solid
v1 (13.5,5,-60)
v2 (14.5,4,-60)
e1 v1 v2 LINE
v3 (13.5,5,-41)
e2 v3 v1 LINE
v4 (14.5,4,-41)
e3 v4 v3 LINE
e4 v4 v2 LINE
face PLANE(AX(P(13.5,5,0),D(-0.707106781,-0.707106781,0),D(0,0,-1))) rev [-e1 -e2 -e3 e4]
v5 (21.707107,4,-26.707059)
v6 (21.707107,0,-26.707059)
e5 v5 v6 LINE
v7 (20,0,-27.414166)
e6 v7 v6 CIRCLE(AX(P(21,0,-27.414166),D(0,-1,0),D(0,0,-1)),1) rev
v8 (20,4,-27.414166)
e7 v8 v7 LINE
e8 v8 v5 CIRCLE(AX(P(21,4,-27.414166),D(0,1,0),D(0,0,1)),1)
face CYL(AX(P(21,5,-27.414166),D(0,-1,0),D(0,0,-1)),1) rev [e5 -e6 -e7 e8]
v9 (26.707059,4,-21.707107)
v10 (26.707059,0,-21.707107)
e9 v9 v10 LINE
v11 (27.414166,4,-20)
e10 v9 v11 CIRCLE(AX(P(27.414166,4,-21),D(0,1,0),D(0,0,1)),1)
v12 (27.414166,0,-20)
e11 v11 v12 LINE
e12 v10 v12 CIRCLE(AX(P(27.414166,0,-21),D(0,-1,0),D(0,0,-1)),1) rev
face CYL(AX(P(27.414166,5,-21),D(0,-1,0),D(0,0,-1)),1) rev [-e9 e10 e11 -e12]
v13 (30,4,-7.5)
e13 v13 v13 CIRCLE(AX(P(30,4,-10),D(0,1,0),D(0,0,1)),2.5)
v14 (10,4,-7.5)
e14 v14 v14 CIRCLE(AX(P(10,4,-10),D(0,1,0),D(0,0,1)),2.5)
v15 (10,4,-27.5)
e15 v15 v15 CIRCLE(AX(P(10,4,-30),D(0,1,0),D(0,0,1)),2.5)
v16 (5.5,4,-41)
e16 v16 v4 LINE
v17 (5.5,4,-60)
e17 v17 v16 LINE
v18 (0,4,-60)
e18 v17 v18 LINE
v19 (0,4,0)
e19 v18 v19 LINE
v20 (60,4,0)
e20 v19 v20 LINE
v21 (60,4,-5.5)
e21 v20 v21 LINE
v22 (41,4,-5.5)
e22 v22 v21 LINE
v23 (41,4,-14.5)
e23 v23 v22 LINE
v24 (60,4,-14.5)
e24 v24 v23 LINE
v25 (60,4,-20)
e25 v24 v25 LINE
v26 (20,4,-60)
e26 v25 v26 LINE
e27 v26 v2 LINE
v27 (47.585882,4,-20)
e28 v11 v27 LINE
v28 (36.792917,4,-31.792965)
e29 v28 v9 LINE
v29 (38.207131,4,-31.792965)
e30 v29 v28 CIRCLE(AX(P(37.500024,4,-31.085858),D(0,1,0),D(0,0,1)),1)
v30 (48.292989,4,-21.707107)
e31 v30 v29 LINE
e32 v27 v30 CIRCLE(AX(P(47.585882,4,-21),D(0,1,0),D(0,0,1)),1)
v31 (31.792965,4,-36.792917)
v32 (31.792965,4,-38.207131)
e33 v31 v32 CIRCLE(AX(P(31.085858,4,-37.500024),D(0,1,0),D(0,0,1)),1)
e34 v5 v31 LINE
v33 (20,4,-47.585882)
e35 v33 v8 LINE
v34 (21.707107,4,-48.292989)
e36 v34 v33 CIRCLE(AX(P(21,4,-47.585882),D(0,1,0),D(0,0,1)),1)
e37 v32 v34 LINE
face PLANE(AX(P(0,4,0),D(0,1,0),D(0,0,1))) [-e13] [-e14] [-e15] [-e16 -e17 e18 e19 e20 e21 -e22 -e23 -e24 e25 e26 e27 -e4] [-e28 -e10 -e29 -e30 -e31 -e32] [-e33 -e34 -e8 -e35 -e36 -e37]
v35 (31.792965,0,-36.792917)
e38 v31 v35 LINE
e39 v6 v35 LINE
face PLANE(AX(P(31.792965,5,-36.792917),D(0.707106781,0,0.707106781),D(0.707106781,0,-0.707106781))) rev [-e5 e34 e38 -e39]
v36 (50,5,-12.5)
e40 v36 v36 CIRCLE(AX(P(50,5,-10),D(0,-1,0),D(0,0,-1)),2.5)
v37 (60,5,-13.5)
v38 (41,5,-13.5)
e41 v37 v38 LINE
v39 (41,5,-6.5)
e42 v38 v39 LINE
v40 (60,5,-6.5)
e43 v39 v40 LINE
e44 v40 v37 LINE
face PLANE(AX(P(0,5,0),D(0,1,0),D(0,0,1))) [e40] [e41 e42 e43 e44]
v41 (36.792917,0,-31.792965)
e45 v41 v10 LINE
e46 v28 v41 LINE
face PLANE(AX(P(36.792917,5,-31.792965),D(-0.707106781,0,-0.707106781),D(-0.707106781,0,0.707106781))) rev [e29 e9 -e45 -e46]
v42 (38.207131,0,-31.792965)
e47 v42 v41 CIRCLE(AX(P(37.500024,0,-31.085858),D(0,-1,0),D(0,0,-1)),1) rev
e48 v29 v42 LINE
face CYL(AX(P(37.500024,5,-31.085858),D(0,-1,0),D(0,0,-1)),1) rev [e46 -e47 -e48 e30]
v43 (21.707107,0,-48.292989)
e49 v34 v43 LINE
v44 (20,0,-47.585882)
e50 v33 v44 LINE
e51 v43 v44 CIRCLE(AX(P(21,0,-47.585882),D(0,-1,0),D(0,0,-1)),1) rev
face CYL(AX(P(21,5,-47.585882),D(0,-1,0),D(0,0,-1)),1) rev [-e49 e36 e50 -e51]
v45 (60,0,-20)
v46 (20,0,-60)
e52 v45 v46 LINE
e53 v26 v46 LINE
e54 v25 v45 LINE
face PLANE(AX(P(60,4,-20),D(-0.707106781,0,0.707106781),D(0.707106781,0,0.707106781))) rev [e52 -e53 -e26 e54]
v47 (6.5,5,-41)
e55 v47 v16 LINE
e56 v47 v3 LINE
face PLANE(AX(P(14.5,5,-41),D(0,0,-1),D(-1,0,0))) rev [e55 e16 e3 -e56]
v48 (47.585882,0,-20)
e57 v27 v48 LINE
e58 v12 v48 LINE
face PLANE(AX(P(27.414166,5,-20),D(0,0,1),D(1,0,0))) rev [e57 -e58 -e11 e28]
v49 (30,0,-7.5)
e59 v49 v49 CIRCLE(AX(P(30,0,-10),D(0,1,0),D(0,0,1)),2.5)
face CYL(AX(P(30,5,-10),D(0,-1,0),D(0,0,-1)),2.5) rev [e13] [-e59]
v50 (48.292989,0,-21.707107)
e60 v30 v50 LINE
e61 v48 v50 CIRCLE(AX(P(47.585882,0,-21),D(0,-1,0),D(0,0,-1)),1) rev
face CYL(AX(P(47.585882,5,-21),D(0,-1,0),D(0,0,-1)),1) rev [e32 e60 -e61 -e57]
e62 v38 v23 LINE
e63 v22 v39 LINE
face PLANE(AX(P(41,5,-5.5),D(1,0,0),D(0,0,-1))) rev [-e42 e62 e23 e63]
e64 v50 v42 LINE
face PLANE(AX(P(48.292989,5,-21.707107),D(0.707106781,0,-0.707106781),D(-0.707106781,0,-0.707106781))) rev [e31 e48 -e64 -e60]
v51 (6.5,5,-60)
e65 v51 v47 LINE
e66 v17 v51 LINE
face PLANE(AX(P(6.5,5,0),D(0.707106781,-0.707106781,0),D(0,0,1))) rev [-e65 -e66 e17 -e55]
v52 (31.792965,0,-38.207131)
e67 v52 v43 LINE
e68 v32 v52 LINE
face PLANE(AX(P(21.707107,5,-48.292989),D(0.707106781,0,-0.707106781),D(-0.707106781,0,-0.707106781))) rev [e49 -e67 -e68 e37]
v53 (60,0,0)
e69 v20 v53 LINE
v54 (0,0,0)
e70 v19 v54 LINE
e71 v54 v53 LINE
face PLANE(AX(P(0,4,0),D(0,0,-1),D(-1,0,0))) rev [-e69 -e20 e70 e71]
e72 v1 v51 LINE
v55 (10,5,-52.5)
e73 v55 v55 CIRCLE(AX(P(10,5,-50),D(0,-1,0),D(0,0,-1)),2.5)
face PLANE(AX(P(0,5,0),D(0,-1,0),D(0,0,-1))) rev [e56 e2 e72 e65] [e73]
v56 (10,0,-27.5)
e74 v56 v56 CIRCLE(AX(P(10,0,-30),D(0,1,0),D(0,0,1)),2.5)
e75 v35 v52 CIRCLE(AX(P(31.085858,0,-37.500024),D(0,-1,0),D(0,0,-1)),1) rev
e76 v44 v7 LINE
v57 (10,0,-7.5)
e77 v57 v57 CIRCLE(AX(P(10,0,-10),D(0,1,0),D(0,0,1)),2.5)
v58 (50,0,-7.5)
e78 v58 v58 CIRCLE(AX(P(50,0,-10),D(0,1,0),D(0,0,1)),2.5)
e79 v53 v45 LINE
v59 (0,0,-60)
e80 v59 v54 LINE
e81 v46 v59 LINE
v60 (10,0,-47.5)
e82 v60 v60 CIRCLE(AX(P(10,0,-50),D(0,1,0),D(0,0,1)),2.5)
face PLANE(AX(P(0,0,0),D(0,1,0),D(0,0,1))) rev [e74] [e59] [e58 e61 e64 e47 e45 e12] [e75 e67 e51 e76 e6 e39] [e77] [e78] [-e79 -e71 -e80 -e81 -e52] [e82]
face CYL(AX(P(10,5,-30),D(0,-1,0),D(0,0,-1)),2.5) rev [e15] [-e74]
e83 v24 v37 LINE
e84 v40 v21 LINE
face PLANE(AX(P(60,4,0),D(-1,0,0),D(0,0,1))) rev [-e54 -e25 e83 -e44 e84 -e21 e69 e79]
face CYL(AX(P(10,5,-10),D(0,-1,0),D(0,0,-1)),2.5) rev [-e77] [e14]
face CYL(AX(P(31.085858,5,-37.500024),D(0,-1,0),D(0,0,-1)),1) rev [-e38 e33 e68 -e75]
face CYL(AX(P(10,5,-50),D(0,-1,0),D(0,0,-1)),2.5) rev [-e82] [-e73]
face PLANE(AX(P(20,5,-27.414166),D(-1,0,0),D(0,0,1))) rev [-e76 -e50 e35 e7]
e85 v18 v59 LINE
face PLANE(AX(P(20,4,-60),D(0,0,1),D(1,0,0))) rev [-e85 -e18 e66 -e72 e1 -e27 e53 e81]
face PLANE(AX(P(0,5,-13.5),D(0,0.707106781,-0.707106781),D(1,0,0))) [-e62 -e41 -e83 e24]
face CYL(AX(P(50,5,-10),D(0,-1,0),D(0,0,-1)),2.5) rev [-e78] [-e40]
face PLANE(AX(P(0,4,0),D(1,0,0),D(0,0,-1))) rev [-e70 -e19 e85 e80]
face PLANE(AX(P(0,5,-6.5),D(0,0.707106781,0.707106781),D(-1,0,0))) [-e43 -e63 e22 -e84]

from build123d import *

# Parameters (mm, degrees)
BOSS_EXTRUDE1_DEPTH     = 4
SKETCH3_W               = 9
SKETCH3_H               = 19
SKETCH3_W_2             = 19
SKETCH3_H_2             = 9
BOSS_EXTRUDE2_DEPTH     = 1
CHAMFER1_SIZE           = 1
CUT_EXTRUDE1_DEPTH      = 86
CUT_EXTRUDE1_DEPTH_BACK = 86
SKETCH2_R               = 2.5


with BuildPart() as part:
    # Sketch1 → Boss-Extrude1 (new body)
    with BuildSketch(Plane(origin=(0, 0, 0), x_dir=(1, 0, 0), z_dir=(0, 1, 0))):
        Polygon((0, 0), (0, 60), (20, 60), (60, 20), (60, 0), align=None)
    extrude(amount=BOSS_EXTRUDE1_DEPTH)

    # Sketch3 → Boss-Extrude2 (add)
    with BuildSketch(Plane(origin=(0, 4, 0), x_dir=(1, 0, 0), z_dir=(0, 1, 0))):
        with Locations((10, 50.5)):
            Rectangle(SKETCH3_W, SKETCH3_H)
        with Locations((50.5, 10)):
            Rectangle(SKETCH3_W_2, SKETCH3_H_2)
    extrude(amount=BOSS_EXTRUDE2_DEPTH)

    # Chamfer1
    chamfer1_edges = [part.edges().sort_by_distance(p)[0] for p in [
        (50.5, 5, -14.5),
        (50.5, 5, -5.5),
        (14.5, 5, -50.5),
        (5.5, 5, -50.5),
    ]]
    chamfer(chamfer1_edges, length=CHAMFER1_SIZE - 0.0001)  # a hair under: the kernel refuses the full size

    # Sketch2 → Cut-Extrude1 (cut, two sides: drawn at the far end of the back side and taken through both)
    with BuildSketch(Plane.XZ.offset(-CUT_EXTRUDE1_DEPTH_BACK)):
        with Locations(Location((50, -10, 0), (0, 0, 270))):
            Circle(SKETCH2_R)
        with Locations(Location((30, -10, 0), (0, 0, 90))):
            Circle(SKETCH2_R)
        with Locations(Location((10, -10, 0), (0, 0, 90))):
            Circle(SKETCH2_R)
        with Locations(Location((10, -30, 0), (0, 0, 90))):
            Circle(SKETCH2_R)
        with Locations(Location((10, -50, 0), (0, 0, 270))):
            Circle(SKETCH2_R)
        with BuildLine():
            Line((48.292989119, -21.707106781), (38.207130756, -31.792965144))
            ThreePointArc((38.207130756, -31.792965144), (37.500023975, -32.085858363), (36.792917194, -31.792965144))
            Line((36.792917194, -31.792965144), (26.707058831, -21.707106781))
            ThreePointArc((26.707058831, -21.707106781), (26.49028608, -20.617316568), (27.414165612, -20))
            Line((27.414165612, -20), (47.585882338, -20))
            ThreePointArc((47.585882338, -20), (48.509761871, -20.617316568), (48.292989119, -21.707106781))
        make_face()
        with BuildLine():
            Line((31.792965144, -36.792917194), (21.707106781, -26.707058831))
            ThreePointArc((21.707106781, -26.707058831), (20.617316568, -26.49028608), (20, -27.414165612))
            Line((20, -27.414165612), (20, -47.585882338))
            ThreePointArc((20, -47.585882338), (20.617316568, -48.509761871), (21.707106781, -48.292989119))
            Line((21.707106781, -48.292989119), (31.792965144, -38.207130756))
            ThreePointArc((31.792965144, -38.207130756), (32.085858363, -37.500023975), (31.792965144, -36.792917194))
        make_face()
    extrude(amount=CUT_EXTRUDE1_DEPTH + CUT_EXTRUDE1_DEPTH_BACK, mode=Mode.SUBTRACT)


solid = part.part
